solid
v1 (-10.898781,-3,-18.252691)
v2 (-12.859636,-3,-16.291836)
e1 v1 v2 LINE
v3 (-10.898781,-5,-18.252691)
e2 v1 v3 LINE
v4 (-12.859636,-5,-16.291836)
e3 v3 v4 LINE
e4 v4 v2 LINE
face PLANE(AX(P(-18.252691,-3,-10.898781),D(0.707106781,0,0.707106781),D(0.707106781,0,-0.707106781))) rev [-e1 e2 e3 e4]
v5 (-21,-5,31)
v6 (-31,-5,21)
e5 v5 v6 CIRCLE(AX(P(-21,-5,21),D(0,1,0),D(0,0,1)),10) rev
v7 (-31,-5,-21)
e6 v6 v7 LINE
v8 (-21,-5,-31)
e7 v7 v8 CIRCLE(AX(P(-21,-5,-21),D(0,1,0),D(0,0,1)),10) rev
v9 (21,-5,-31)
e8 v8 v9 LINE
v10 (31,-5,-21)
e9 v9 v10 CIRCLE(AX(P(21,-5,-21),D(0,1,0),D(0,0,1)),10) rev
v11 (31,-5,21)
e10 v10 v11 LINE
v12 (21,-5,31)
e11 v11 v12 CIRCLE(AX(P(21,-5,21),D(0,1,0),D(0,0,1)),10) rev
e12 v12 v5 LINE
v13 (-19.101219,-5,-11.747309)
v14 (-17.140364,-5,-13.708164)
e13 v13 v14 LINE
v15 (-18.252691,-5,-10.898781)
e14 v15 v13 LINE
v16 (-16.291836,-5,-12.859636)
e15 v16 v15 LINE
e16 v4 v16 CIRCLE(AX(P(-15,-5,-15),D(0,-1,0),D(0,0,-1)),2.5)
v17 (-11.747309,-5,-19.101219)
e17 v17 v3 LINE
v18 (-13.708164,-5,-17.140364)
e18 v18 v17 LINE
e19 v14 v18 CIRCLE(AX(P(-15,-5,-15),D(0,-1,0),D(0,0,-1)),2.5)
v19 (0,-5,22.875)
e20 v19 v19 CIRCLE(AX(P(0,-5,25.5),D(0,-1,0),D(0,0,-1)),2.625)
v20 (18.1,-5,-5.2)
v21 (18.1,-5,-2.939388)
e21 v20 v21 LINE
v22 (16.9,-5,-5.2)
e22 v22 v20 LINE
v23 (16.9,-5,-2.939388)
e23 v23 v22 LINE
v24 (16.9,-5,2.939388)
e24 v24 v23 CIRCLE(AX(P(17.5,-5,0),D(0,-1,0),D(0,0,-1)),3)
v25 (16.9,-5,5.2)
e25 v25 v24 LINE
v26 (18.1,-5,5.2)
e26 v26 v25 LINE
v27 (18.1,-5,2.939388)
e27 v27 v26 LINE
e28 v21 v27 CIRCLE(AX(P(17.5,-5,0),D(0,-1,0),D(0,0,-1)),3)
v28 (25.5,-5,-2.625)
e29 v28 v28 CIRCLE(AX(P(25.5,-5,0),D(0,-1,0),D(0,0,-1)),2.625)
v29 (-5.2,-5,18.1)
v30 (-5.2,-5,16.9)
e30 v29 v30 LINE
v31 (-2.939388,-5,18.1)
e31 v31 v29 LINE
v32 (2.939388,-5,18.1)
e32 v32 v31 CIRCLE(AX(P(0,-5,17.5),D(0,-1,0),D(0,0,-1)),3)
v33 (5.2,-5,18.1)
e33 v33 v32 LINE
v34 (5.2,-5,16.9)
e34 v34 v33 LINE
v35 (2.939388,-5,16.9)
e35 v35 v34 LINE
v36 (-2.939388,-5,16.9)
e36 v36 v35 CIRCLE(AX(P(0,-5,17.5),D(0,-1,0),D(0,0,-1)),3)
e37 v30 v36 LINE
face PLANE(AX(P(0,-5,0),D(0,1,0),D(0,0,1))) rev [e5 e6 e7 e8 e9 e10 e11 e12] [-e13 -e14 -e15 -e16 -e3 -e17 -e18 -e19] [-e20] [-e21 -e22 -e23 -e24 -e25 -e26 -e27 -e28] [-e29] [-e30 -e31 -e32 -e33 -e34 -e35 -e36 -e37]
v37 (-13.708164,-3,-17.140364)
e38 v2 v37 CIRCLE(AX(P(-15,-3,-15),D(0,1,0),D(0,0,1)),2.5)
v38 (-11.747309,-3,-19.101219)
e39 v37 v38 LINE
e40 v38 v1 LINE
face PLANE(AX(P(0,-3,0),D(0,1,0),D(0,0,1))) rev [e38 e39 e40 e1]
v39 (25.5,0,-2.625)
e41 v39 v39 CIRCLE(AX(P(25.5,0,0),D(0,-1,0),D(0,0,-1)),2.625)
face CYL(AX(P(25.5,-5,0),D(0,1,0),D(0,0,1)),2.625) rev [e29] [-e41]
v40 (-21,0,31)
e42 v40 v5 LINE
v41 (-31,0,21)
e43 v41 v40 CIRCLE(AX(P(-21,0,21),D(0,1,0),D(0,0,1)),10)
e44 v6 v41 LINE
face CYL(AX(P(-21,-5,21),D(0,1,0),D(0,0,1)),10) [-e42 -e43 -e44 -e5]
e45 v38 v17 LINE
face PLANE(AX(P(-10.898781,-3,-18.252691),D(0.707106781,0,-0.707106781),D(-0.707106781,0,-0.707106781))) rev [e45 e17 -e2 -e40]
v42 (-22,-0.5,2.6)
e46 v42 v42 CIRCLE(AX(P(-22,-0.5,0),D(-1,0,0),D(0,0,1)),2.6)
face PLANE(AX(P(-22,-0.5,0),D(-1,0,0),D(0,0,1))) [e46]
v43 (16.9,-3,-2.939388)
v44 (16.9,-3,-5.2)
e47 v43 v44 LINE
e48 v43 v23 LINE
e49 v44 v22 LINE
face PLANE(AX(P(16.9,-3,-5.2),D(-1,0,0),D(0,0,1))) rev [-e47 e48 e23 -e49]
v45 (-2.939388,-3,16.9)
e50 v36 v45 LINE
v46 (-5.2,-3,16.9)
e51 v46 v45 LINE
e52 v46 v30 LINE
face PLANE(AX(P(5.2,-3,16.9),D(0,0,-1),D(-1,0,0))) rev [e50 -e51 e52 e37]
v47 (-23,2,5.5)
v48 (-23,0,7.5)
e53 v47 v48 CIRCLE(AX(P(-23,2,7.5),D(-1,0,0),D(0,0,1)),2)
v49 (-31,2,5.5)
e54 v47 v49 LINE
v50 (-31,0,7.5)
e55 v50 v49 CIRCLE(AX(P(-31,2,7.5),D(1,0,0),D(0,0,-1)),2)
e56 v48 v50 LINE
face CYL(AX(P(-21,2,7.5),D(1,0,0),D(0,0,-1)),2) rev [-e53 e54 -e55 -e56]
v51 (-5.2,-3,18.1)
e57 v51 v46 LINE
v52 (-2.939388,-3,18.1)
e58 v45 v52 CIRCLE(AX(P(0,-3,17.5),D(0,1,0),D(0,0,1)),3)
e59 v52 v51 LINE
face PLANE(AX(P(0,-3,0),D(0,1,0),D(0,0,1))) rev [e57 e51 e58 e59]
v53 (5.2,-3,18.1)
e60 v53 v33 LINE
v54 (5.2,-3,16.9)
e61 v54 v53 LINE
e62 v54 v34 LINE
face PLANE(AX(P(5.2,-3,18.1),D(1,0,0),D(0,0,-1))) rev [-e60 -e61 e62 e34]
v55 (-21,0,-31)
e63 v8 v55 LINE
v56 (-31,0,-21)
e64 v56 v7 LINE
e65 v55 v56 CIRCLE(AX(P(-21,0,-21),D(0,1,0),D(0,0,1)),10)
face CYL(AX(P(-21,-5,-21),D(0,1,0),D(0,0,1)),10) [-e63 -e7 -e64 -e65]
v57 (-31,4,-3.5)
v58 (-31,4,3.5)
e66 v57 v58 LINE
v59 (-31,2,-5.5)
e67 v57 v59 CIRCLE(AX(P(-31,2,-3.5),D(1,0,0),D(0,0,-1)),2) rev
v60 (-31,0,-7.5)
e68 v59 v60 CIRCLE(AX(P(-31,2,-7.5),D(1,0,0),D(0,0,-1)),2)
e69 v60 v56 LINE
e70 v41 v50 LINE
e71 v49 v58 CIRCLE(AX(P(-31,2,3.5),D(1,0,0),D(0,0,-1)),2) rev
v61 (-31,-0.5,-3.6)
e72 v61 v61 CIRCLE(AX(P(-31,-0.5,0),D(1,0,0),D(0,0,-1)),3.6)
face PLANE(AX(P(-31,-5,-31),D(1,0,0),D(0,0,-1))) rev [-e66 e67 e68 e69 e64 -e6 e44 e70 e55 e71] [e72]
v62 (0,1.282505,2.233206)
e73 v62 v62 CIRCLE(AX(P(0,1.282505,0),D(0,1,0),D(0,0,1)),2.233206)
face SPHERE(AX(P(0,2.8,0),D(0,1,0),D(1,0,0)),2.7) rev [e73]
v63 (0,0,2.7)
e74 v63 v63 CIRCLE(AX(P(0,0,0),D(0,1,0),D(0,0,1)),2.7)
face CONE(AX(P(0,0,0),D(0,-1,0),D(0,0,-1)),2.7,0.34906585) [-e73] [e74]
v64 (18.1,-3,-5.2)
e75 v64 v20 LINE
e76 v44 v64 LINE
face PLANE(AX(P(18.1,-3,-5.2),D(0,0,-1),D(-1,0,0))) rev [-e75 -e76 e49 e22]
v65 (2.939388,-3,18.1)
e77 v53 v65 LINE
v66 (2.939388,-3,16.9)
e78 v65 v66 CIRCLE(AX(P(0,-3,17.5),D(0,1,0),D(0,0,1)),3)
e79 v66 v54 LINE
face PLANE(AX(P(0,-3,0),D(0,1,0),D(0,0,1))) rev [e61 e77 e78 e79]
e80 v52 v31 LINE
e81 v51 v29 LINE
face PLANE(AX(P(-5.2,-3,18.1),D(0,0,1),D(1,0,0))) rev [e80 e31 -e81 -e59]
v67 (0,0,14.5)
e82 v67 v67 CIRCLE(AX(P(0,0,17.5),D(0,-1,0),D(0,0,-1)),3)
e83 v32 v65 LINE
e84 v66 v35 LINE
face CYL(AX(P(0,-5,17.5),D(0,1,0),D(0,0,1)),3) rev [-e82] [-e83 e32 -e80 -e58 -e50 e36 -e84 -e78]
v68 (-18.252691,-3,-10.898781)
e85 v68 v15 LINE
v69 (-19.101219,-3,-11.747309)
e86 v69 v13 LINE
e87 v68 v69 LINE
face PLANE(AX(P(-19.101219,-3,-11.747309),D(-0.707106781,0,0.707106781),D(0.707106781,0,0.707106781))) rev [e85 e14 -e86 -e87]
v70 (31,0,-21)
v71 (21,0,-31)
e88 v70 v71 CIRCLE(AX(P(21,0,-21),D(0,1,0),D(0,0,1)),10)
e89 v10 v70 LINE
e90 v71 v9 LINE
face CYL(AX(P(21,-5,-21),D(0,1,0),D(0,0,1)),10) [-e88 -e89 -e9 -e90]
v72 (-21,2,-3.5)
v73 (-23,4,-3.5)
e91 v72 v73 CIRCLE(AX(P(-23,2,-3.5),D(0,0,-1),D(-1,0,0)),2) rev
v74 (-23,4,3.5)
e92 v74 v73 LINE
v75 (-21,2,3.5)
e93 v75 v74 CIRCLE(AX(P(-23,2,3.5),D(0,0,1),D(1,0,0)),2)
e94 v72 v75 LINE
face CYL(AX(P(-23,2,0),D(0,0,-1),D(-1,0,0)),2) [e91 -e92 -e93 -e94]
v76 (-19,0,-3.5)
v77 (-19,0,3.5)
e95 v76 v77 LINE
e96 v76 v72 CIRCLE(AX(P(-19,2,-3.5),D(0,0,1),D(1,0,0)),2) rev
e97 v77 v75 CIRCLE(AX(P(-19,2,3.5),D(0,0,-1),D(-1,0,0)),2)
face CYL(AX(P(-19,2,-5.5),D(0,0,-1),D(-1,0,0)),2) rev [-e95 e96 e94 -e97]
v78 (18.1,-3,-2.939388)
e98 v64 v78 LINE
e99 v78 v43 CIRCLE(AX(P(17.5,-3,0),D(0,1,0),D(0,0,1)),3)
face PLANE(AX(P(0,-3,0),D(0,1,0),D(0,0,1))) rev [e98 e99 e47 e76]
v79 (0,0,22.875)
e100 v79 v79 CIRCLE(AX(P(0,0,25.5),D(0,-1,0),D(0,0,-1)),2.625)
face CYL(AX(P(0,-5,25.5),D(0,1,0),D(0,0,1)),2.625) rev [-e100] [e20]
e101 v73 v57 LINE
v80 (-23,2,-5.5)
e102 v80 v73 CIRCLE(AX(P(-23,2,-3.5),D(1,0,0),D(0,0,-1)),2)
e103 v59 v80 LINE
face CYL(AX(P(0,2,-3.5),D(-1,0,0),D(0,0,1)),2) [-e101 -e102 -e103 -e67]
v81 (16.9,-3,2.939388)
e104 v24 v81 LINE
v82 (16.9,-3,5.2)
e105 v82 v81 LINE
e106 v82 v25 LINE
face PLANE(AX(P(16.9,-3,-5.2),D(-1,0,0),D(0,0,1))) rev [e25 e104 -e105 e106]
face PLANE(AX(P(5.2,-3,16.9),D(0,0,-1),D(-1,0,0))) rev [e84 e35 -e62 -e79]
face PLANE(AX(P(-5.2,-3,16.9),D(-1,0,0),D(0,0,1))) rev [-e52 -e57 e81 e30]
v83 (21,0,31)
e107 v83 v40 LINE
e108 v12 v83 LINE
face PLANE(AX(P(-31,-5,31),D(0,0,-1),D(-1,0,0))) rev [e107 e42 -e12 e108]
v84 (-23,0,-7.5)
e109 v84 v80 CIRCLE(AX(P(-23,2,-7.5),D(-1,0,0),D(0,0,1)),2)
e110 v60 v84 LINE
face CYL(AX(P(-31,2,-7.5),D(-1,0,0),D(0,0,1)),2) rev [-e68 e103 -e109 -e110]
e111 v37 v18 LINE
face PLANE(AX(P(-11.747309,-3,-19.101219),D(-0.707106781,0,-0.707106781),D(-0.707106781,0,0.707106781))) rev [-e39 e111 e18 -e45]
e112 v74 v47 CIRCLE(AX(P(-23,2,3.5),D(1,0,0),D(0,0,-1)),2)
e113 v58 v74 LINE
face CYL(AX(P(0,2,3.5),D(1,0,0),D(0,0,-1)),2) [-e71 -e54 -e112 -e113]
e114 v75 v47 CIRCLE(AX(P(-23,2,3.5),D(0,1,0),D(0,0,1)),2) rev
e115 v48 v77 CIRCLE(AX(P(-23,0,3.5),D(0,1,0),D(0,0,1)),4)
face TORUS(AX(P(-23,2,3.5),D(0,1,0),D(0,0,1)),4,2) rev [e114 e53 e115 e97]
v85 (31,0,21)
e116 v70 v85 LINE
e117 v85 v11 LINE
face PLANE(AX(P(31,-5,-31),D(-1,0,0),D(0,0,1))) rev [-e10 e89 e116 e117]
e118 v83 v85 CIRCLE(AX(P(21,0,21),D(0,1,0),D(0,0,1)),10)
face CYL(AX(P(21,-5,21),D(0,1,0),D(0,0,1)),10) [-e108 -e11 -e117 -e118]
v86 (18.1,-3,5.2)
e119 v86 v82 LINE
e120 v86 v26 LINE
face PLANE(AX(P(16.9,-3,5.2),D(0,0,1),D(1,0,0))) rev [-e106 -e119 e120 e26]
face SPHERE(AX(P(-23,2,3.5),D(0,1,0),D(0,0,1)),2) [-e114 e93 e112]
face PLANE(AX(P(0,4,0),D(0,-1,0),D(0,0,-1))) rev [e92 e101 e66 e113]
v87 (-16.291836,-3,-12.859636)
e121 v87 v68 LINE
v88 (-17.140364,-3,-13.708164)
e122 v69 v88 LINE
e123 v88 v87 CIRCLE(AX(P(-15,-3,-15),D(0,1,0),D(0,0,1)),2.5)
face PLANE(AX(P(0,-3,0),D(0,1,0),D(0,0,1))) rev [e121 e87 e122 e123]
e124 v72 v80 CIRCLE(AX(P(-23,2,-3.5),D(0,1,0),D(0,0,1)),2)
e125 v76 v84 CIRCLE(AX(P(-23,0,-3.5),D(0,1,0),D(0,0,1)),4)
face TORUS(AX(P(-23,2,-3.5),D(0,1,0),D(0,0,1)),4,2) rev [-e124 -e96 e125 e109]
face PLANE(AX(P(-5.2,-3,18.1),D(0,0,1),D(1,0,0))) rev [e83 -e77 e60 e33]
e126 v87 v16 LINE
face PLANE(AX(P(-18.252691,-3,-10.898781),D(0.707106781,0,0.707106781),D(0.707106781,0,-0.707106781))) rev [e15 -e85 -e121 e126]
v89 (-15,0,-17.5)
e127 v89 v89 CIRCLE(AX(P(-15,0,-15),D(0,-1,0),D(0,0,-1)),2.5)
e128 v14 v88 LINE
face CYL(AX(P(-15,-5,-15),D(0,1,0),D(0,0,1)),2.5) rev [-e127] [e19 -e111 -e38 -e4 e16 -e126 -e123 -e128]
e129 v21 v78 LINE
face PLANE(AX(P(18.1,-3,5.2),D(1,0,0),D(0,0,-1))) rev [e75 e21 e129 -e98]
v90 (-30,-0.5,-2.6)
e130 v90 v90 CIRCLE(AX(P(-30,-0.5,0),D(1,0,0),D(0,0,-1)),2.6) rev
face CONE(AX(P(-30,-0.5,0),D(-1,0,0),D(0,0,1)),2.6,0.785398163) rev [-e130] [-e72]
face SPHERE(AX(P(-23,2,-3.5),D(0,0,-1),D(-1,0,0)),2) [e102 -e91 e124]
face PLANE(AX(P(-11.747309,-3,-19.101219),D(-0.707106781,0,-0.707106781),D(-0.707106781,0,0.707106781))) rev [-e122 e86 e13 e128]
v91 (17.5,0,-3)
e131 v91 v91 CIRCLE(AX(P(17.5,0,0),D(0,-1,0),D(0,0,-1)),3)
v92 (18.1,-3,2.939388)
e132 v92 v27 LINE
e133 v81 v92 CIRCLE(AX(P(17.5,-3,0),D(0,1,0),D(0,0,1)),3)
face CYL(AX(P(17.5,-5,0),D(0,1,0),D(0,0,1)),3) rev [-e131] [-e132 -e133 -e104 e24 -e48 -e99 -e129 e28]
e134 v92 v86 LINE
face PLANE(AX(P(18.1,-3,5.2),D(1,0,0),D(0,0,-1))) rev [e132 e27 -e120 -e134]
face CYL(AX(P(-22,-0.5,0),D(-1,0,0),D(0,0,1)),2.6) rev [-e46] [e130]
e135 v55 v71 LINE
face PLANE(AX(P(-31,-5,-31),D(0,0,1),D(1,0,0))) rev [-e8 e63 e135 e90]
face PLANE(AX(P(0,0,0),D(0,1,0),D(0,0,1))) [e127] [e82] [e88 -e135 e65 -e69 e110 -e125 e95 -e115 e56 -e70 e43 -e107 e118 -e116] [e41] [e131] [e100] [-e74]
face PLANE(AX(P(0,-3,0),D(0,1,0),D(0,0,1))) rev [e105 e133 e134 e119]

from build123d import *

# Parameters (mm, degrees)
SKETCH4_W           = 62
SKETCH4_H           = 62
SKETCH4_R           = 3
SKETCH4_R_2         = 2.5
SKETCH4_R_3         = 2.625
BOSS_EXTRUDE2_DEPTH = 5
SKETCH5_W           = 10.4
SKETCH5_H           = 1.2
SKETCH5_W_2         = 1.2
SKETCH5_H_2         = 10.4
CUT_EXTRUDE1_DEPTH  = 2
FILLET1_R           = 10
SKETCH6_W           = 10
SKETCH6_H           = 11
BOSS_EXTRUDE3_DEPTH = 4
SKETCH7_R           = 2.6
CUT_EXTRUDE2_DEPTH  = 9
CHAMFER1_SIZE       = 1
FILLET2_R           = 2


with BuildPart() as part:
    # Sketch3 → Revolve1 (revolve)
    with BuildSketch(Plane.XY, mode=Mode.PRIVATE) as revolve1_sk:
        with BuildLine():
            Line((0, 0), (2.7, 0))
            Line((2.7, 0), (2.233206222, 1.282505364))
            ThreePointArc((2.233206222, 1.282505364), (1.26348021, 0.413869711), (0, 0.1))
            Line((0, 0.1), (0, 0))
        make_face()
    revolve(revolve1_sk.sketch.rotate(Axis((0, 0.1, 0), (0, -1, 0)), 90), axis=Axis((0, 0.1, 0), (0, -1, 0)))

    # Sketch4 → Boss-Extrude2 (add)
    with BuildSketch(Plane.XZ):
        Rectangle(SKETCH4_W, SKETCH4_H)
        with Locations(Location((17.5, 0, 0), (0, 0, 270))):
            Circle(SKETCH4_R, mode=Mode.SUBTRACT)
        with Locations(Location((0, 17.5, 0), (0, 0, 270))):
            Circle(SKETCH4_R, mode=Mode.SUBTRACT)
        with Locations(Location((-15, -15, 0), (0, 0, 270))):
            Circle(SKETCH4_R_2, mode=Mode.SUBTRACT)
        with Locations(Location((0, 25.5, 0), (0, 0, 270))):
            Circle(SKETCH4_R_3, mode=Mode.SUBTRACT)
        with Locations(Location((25.5, 0, 0), (0, 0, 270))):
            Circle(SKETCH4_R_3, mode=Mode.SUBTRACT)
    extrude(amount=BOSS_EXTRUDE2_DEPTH)

    # Sketch5 → Cut-Extrude1 (cut)
    with BuildSketch(Plane.XZ.offset(5)):
        with Locations((0, 17.5)):
            Rectangle(SKETCH5_W, SKETCH5_H)
        with Locations((17.5, 0)):
            Rectangle(SKETCH5_W_2, SKETCH5_H_2)
        Polygon((-18.252691193, -10.898780669), (-10.898780669, -18.252691193), (-11.747308807, -19.101219331), (-19.101219331, -11.747308807), align=None)
    extrude(amount=-CUT_EXTRUDE1_DEPTH, mode=Mode.SUBTRACT)

    # Fillet1
    fillet1_edges = [part.edges().sort_by_distance(p)[0] for p in [
        (31, -2.5, -31),
        (31, -2.5, 31),
        (-31, -2.5, 31),
        (-31, -2.5, -31),
    ]]
    fillet(fillet1_edges, radius=FILLET1_R)

    # Sketch6 → Boss-Extrude3 (add)
    with BuildSketch(Plane(origin=(0, 0, 0), x_dir=(1, 0, 0), z_dir=(0, 1, 0))):
        with Locations((-26, 0)):
            Rectangle(SKETCH6_W, SKETCH6_H)
    extrude(amount=BOSS_EXTRUDE3_DEPTH)

    # Sketch7 → Cut-Extrude2 (cut)
    with BuildSketch(Plane.ZY.offset(31)):
        with Locations((0, -0.5)):
            Circle(SKETCH7_R)
    extrude(amount=-CUT_EXTRUDE2_DEPTH, mode=Mode.SUBTRACT)

    # Chamfer1
    chamfer1_edges = [part.edges().sort_by_distance(p)[0] for p in [
        (-31, -0.5, -2.6),
    ]]
    chamfer(chamfer1_edges, length=CHAMFER1_SIZE)

    # Fillet2
    fillet2_edges = [part.edges().sort_by_distance(p)[0] for p in [
        (-26, 0, 5.5),
        (-21, 0, 0),
        (-21, 2, 5.5),
        (-26, 0, -5.5),
        (-21, 2, -5.5),
        (-26, 4, 5.5),
        (-21, 4, 0),
        (-26, 4, -5.5),
    ]]
    fillet(fillet2_edges, radius=FILLET2_R - 0.0001)  # a hair under: the kernel refuses the full size


solid = part.part
